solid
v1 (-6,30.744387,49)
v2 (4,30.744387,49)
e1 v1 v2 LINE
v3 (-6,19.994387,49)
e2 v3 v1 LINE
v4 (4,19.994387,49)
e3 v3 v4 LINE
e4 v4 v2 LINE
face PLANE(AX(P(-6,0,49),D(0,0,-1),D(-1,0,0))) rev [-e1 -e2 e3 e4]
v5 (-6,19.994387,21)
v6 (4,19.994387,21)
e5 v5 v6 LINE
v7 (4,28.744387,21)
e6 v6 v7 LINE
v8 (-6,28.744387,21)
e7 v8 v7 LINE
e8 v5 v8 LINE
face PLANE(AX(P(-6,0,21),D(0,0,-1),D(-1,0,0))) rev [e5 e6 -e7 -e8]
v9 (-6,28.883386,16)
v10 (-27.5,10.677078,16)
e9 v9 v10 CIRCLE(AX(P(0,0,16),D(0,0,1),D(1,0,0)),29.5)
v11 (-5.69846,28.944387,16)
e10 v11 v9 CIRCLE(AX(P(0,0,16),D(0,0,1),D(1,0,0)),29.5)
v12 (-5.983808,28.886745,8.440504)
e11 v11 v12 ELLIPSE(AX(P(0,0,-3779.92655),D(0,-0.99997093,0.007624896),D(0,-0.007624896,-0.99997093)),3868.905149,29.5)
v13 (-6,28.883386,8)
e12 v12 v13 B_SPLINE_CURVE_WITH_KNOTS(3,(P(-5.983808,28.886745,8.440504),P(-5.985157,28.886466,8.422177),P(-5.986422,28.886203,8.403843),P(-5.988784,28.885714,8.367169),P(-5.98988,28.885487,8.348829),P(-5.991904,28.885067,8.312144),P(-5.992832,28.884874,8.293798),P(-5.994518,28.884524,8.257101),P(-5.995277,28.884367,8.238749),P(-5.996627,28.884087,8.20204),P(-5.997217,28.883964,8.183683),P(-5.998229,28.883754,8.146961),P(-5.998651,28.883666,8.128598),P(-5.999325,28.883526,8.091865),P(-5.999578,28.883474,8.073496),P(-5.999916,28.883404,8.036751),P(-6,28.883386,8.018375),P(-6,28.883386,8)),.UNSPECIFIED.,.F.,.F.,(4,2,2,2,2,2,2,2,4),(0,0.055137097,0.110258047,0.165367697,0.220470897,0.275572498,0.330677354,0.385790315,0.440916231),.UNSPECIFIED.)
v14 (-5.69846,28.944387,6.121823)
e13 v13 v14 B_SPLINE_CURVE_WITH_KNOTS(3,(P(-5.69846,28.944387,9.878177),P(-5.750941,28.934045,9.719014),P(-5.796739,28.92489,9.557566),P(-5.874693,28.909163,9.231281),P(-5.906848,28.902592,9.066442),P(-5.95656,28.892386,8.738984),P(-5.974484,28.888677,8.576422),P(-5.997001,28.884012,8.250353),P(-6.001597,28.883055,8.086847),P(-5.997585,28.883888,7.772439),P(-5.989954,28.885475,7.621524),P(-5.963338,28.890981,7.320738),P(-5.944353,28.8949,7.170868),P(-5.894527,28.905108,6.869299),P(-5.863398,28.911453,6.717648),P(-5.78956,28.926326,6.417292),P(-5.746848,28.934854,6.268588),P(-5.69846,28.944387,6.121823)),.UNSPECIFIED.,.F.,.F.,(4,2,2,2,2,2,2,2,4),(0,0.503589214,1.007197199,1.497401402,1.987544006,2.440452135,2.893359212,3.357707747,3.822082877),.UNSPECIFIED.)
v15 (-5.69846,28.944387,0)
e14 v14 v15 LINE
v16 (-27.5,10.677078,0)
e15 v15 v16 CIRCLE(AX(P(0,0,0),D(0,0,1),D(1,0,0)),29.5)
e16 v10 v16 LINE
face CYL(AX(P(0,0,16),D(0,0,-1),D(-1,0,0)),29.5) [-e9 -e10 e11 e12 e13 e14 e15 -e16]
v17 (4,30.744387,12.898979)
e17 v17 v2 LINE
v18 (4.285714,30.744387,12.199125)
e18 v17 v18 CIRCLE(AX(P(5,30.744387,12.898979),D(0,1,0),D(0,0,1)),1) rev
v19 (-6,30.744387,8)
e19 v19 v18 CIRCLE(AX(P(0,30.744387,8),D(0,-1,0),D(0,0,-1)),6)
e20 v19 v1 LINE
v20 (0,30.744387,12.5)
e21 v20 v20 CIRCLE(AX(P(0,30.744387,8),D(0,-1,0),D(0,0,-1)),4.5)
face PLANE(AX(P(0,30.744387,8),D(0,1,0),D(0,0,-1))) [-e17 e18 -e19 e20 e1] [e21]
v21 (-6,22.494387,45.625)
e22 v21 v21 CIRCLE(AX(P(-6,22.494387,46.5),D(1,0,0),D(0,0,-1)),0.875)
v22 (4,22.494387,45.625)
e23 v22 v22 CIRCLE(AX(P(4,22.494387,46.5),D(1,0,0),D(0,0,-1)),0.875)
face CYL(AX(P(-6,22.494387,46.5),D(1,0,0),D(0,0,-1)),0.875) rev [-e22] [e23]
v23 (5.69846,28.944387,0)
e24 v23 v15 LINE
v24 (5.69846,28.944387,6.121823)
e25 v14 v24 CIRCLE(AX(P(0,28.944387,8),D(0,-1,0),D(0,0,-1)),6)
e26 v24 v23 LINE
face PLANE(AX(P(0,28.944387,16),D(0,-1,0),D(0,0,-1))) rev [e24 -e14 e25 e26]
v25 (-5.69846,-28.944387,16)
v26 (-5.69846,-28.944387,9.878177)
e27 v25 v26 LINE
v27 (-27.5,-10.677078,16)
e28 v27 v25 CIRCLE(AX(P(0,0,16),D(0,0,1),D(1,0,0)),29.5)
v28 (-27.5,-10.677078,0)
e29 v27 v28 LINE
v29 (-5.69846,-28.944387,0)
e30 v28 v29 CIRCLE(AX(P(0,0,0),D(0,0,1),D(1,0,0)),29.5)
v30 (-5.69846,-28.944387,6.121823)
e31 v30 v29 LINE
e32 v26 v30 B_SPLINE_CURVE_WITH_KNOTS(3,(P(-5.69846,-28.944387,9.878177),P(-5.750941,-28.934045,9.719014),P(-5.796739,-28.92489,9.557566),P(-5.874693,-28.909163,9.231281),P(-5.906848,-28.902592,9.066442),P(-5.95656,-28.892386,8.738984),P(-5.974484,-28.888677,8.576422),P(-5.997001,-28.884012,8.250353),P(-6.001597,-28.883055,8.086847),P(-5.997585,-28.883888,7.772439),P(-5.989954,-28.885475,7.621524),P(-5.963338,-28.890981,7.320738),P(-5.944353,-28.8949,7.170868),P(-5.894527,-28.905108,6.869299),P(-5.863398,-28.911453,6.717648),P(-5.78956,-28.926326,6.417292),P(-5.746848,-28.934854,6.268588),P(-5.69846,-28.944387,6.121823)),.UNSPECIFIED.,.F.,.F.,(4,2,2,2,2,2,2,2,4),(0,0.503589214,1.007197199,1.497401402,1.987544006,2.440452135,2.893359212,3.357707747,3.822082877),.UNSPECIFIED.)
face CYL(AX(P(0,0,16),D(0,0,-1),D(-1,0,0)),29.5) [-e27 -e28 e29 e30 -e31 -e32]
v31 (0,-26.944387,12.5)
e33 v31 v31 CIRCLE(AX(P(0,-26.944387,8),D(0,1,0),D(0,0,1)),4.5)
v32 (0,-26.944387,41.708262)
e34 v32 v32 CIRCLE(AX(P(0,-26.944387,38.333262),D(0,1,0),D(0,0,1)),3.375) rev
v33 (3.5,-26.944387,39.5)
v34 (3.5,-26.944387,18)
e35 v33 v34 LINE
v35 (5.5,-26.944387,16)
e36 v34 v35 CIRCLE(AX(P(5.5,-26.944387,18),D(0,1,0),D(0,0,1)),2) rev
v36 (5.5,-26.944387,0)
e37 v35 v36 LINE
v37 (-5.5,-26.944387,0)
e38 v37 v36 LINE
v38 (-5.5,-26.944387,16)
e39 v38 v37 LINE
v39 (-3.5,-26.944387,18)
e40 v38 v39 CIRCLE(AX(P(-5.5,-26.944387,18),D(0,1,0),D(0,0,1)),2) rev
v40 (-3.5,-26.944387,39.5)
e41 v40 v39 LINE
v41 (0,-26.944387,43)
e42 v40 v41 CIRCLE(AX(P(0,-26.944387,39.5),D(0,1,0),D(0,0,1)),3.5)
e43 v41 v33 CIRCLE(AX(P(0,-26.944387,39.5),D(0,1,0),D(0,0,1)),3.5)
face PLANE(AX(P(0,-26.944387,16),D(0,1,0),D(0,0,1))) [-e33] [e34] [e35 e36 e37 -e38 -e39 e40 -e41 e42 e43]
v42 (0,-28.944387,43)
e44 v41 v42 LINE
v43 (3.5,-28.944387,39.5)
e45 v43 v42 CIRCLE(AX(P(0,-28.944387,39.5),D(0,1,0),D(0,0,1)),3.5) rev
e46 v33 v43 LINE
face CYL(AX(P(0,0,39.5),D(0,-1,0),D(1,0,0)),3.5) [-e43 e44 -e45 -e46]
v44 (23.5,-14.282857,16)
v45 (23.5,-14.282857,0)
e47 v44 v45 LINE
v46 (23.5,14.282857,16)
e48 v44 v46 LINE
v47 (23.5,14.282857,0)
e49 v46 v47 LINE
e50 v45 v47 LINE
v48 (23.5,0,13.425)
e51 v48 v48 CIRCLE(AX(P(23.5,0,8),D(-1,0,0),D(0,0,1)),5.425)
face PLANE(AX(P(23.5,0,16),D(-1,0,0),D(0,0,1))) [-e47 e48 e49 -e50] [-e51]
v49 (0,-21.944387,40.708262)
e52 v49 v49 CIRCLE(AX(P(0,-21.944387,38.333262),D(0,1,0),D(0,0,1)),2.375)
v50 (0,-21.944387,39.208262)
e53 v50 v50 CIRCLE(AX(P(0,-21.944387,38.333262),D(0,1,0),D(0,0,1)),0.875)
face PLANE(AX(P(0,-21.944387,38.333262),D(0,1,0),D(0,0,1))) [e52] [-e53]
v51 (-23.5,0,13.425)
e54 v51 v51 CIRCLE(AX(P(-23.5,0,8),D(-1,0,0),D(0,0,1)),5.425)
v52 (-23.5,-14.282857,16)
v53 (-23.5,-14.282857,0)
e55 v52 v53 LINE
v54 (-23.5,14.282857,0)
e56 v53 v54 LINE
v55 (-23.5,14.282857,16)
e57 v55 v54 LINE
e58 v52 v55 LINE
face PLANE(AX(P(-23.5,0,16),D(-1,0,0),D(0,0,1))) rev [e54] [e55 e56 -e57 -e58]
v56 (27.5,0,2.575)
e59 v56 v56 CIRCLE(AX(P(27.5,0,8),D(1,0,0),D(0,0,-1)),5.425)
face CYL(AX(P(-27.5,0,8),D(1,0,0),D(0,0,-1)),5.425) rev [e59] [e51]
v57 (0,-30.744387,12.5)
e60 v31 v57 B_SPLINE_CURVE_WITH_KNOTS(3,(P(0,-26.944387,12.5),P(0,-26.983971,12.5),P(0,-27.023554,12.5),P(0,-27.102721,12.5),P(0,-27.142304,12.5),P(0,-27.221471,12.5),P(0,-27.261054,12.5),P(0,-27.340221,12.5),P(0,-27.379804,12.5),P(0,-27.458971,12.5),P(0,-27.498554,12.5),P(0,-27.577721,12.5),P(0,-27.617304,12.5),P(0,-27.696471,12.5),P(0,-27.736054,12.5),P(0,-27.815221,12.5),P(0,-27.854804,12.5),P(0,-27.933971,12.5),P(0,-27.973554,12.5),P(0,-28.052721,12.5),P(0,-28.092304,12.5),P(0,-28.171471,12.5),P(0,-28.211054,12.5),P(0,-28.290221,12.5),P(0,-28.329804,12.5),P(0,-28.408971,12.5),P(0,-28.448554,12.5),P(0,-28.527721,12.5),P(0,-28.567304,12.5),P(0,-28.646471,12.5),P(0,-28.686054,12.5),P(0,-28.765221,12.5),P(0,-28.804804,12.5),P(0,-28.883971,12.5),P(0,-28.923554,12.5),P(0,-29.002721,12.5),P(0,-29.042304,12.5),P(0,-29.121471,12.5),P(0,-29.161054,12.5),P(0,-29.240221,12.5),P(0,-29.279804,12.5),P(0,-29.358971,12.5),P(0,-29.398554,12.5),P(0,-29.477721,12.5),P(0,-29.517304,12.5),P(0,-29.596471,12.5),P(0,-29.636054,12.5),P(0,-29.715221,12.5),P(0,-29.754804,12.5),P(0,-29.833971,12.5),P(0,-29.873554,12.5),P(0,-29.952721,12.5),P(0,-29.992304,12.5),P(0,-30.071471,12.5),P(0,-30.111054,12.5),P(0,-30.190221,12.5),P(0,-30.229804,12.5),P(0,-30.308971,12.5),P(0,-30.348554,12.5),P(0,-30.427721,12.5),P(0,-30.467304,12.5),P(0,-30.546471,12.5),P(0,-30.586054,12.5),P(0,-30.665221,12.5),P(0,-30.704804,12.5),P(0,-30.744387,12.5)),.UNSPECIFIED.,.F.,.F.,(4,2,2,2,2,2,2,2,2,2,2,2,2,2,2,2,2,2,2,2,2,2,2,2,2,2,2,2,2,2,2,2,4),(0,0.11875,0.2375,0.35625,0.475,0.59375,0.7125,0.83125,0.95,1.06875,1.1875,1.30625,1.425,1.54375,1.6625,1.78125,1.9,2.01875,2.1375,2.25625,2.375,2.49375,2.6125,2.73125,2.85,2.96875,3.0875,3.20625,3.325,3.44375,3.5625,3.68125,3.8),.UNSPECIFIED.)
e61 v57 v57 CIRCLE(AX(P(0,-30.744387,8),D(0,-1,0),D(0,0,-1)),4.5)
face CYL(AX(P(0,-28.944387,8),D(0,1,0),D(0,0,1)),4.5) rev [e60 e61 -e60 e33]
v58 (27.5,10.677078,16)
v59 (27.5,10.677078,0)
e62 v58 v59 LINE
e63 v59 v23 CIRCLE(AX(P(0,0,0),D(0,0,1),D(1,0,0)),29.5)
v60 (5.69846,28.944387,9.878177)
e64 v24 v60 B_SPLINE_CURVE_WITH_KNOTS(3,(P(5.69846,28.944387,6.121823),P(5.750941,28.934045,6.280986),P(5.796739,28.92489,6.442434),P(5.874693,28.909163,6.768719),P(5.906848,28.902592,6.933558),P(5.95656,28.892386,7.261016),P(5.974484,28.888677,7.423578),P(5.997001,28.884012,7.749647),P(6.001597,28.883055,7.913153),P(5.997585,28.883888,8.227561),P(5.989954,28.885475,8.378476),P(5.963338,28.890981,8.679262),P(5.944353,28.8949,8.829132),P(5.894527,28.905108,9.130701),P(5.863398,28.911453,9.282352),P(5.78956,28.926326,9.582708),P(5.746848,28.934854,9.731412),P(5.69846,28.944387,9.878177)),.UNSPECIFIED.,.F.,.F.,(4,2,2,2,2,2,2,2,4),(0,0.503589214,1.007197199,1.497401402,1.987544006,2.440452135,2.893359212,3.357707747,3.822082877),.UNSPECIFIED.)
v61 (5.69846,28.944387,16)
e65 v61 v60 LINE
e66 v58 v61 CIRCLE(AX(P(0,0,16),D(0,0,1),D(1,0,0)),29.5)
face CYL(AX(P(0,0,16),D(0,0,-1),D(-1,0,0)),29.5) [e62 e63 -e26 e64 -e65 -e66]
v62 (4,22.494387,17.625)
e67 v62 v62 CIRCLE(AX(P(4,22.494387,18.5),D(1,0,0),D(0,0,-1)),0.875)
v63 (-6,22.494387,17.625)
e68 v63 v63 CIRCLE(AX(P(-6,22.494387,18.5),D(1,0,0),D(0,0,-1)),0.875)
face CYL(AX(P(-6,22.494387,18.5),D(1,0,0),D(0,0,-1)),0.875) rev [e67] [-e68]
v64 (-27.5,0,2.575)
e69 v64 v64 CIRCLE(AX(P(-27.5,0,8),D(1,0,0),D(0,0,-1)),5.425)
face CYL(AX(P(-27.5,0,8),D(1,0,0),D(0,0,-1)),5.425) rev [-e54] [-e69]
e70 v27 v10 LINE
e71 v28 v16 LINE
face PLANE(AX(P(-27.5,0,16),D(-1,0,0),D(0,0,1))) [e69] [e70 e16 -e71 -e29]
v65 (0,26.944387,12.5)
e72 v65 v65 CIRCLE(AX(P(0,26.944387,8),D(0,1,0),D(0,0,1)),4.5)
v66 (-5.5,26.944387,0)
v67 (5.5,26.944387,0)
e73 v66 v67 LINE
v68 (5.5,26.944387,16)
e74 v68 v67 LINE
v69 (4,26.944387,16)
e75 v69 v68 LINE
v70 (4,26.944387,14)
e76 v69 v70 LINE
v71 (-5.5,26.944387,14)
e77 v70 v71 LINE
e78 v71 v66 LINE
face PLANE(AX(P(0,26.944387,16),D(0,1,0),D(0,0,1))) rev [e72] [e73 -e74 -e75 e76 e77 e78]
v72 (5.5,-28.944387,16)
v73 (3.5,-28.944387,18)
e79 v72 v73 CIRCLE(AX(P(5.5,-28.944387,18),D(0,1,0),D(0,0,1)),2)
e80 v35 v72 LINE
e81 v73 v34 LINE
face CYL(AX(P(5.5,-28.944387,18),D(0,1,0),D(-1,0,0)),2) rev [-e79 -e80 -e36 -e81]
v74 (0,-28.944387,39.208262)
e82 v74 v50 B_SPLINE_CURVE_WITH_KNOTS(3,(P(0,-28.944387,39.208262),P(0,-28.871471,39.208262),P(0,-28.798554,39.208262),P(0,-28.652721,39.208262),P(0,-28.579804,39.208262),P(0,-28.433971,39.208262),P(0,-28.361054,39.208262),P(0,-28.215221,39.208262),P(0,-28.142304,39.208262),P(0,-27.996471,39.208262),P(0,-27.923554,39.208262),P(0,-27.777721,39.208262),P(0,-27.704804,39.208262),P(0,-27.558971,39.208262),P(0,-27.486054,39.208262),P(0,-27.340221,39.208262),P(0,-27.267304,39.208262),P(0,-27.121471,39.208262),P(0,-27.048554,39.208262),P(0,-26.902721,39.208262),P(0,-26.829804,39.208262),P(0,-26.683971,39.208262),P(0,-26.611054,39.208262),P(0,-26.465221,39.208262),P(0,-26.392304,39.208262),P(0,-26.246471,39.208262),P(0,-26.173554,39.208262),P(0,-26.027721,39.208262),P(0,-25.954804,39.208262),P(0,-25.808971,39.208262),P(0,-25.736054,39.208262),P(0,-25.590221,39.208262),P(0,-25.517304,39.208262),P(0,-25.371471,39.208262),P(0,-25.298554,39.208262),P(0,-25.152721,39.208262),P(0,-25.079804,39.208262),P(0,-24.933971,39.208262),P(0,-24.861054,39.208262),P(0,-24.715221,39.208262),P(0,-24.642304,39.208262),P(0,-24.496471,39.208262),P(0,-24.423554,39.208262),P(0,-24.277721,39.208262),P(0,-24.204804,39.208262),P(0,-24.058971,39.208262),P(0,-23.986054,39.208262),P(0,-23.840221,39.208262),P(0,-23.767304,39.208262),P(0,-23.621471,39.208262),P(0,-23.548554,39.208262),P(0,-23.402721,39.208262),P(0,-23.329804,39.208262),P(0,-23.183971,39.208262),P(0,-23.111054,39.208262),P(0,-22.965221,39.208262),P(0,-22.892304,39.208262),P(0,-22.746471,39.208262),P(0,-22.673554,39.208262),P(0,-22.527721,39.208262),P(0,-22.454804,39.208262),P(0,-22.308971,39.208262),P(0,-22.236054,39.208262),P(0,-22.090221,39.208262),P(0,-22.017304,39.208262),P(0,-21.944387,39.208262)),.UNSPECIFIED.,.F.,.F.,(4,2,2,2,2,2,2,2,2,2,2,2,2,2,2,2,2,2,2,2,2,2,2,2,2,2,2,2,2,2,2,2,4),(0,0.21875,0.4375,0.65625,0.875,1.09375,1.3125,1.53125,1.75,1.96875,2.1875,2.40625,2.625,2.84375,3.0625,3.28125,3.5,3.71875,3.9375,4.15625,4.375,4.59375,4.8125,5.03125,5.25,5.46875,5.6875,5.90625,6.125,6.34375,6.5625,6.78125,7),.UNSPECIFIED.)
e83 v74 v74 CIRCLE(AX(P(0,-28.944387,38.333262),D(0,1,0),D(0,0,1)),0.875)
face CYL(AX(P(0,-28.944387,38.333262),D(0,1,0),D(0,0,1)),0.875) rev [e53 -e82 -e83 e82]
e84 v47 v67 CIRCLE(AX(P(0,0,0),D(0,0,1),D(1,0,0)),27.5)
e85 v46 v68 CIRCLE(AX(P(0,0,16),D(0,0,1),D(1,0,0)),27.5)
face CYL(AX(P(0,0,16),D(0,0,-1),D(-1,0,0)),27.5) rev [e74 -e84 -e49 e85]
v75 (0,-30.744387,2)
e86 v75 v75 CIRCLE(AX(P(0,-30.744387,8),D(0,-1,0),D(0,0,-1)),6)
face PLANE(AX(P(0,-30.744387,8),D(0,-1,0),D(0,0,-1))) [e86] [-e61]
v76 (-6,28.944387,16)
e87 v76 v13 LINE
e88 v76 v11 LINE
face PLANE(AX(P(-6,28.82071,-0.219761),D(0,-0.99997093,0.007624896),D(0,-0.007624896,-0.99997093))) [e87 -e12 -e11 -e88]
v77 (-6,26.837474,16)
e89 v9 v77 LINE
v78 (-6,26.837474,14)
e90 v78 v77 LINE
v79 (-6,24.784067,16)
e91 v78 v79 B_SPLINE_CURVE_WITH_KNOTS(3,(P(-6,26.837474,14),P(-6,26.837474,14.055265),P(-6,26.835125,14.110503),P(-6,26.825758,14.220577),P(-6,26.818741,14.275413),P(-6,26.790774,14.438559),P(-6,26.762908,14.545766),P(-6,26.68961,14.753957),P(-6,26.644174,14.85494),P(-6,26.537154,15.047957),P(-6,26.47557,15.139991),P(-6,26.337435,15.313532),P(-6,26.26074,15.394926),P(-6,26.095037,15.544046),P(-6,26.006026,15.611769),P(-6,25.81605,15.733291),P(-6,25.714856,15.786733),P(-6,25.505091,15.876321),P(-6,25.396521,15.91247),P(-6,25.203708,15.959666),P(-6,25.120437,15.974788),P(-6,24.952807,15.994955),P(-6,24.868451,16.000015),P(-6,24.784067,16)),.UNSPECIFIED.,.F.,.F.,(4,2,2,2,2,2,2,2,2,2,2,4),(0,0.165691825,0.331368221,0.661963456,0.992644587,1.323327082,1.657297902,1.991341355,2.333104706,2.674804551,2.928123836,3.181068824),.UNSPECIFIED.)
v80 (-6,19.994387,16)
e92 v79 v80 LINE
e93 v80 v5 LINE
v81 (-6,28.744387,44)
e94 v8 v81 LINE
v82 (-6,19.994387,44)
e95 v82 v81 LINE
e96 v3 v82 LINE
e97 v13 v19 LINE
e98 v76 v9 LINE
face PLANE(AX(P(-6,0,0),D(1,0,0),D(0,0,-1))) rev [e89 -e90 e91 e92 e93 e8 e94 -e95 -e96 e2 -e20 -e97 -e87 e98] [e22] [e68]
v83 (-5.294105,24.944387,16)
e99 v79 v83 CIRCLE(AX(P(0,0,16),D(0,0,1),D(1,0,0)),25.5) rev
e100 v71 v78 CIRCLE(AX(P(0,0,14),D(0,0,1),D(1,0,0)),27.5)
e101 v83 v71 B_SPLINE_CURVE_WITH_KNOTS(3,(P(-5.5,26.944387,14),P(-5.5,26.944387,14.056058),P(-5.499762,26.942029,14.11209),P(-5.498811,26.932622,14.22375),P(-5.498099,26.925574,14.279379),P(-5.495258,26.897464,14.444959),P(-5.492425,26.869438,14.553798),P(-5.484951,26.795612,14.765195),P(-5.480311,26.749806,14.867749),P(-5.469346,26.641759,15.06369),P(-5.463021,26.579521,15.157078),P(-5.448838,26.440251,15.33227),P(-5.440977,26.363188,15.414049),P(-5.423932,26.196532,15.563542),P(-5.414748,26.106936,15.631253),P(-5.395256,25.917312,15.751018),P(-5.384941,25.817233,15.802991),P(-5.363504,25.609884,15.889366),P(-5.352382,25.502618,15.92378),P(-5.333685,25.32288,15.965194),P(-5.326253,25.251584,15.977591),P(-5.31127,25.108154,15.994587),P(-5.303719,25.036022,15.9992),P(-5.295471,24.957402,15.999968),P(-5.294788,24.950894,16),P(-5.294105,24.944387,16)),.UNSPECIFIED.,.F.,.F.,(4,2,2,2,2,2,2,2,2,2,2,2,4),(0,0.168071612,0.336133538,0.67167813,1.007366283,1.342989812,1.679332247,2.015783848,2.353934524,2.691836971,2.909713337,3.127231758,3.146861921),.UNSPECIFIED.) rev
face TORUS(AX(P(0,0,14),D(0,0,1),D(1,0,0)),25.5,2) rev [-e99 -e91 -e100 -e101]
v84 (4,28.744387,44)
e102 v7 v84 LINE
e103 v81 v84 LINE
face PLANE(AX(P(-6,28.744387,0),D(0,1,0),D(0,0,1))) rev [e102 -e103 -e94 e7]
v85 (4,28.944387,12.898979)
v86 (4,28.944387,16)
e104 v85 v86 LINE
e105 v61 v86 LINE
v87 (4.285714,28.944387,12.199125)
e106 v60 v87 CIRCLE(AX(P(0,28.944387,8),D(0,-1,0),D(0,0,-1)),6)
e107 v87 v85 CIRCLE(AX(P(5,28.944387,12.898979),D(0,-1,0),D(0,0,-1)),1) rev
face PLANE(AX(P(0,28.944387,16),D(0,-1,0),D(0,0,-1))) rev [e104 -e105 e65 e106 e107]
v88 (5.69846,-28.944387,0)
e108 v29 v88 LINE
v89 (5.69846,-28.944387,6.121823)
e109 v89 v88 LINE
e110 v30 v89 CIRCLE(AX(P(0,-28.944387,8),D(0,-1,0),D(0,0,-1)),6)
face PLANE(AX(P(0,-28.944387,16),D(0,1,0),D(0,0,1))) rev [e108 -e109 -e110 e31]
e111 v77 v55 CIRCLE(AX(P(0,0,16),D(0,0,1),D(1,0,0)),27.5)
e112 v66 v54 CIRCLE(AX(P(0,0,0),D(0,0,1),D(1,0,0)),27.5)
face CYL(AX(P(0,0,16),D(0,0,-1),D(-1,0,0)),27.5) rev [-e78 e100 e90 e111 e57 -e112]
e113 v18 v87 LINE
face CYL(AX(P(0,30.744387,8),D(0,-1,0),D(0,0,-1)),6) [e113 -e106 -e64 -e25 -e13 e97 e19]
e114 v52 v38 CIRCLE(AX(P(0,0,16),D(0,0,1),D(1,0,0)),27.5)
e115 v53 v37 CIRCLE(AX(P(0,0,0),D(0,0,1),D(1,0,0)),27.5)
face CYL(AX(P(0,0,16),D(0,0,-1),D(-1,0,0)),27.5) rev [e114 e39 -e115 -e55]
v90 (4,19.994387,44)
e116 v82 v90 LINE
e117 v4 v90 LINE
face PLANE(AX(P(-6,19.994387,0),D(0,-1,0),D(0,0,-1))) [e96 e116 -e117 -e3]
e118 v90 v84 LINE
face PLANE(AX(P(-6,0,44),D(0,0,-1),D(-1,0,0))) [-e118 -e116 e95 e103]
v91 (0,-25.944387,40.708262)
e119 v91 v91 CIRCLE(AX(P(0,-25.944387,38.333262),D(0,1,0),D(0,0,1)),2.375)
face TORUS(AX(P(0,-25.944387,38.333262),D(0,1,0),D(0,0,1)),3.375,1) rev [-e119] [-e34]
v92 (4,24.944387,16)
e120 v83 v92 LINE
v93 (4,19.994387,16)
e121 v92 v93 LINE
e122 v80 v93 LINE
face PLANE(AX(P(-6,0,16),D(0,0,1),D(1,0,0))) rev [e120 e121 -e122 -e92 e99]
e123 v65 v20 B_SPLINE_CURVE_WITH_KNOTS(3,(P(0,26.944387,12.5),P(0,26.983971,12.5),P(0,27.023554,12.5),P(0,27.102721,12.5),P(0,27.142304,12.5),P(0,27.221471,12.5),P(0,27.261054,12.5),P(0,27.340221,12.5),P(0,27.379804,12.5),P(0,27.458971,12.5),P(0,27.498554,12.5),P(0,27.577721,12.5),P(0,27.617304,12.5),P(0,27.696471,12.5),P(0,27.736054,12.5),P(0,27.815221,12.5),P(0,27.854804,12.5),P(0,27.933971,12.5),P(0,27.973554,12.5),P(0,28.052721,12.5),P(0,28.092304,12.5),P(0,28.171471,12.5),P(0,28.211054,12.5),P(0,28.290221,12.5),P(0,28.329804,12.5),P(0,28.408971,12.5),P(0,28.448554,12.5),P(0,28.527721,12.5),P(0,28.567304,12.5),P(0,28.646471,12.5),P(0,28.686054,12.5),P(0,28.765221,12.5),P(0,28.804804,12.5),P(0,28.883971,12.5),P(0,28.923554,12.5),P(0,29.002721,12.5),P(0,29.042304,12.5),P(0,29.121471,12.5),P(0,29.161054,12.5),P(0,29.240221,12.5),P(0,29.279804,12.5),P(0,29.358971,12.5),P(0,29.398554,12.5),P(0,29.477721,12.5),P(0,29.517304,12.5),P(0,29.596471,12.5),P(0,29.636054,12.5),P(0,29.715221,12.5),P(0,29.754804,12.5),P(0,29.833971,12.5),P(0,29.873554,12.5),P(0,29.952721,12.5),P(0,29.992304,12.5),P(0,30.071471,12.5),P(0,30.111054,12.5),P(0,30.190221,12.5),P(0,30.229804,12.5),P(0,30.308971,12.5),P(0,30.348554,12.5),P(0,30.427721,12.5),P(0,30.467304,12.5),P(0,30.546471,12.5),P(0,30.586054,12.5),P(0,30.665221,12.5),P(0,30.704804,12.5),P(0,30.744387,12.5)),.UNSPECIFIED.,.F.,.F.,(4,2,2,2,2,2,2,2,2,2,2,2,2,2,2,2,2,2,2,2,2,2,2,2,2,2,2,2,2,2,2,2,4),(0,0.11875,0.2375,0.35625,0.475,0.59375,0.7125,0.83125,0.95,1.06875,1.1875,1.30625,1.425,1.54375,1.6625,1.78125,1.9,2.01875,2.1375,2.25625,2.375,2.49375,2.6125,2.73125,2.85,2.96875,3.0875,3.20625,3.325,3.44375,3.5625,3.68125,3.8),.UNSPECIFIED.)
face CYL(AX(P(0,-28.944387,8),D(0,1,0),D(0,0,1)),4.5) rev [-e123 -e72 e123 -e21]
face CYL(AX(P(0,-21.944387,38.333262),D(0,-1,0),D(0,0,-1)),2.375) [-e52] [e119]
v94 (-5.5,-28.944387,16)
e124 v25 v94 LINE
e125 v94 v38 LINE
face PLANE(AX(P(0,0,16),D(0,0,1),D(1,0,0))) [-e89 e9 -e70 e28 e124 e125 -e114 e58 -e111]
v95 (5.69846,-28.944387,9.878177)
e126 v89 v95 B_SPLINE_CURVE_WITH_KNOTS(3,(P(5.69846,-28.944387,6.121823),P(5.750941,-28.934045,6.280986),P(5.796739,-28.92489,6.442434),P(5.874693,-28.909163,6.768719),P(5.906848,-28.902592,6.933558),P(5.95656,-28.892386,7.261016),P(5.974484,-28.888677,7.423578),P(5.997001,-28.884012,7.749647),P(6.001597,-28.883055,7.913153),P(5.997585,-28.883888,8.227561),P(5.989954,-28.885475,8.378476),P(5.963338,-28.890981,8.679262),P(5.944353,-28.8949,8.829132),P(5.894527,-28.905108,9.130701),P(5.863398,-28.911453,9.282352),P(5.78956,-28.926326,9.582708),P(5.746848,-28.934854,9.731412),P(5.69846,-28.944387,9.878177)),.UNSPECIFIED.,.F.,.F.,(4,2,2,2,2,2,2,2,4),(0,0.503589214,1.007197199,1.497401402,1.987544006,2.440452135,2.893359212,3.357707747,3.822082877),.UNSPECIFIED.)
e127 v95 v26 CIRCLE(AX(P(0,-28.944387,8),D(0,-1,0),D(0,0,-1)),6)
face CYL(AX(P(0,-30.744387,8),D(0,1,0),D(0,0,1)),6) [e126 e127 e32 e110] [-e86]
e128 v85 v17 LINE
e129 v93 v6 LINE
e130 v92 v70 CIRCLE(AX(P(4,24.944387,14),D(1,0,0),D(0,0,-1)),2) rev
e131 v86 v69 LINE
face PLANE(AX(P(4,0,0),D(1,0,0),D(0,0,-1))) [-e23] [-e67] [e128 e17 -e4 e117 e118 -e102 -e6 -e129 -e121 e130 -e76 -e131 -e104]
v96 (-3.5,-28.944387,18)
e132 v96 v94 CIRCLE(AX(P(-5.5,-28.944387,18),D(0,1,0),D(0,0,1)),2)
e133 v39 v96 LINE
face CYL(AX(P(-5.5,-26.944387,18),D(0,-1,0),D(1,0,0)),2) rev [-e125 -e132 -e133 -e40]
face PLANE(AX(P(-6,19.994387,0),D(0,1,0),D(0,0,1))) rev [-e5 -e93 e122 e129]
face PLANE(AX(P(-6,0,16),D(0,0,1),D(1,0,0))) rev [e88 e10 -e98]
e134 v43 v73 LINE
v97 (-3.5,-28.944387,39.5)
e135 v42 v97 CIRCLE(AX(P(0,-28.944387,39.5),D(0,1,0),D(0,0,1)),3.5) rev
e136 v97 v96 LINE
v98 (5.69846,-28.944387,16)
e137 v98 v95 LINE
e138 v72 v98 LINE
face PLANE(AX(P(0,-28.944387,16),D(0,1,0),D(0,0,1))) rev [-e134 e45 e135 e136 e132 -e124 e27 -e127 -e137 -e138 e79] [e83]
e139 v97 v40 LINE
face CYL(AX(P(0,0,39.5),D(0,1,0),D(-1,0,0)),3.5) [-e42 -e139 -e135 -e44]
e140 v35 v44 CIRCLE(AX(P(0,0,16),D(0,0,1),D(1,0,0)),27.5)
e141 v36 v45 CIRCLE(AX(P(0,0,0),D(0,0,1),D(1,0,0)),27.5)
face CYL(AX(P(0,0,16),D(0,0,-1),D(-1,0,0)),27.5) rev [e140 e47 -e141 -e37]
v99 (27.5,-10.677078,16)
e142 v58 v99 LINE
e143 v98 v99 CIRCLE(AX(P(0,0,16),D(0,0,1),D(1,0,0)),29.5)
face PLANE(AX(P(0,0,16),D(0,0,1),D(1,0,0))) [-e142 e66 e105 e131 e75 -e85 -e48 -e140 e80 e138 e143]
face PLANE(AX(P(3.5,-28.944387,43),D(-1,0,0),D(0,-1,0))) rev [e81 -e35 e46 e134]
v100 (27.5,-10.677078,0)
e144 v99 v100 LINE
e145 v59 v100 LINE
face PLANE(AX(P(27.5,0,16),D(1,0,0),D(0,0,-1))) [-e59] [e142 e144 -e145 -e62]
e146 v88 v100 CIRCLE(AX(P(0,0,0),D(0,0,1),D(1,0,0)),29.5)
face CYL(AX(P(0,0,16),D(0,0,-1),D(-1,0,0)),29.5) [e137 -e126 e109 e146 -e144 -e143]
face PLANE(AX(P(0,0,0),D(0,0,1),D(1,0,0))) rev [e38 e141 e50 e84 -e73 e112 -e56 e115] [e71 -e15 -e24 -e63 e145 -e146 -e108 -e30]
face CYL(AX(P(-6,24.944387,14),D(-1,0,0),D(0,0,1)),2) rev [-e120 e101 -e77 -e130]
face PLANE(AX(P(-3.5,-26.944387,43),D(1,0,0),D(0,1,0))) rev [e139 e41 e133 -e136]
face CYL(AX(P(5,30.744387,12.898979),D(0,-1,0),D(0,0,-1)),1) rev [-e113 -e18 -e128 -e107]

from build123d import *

# Parameters (mm, degrees)
BOSS_EXTRUDE1_DEPTH      = 16
SKETCH3_W                = 7
SKETCH3_H                = 2
BOSS_EXTRUDE2_DEPTH      = 27
FILLET1_R                = 3.5
CUT_EXTRUDE1_DEPTH       = 59.677317156
CUT_EXTRUDE1_DEPTH_BACK  = 59.677317156
SKETCH4_R                = 5.425
CUT_EXTRUDE2_DEPTH       = 59.677317156
CUT_EXTRUDE2_DEPTH_BACK  = 59.677317156
SKETCH5_R                = 4.5
SKETCH5_R_2              = 0.875
BOSS_EXTRUDE4_START      = -0.061001
SKETCH8_R                = 6
SKETCH8_R_2              = 4.5
BOSS_EXTRUDE4_DEPTH      = 1.861001
FILLET2_R                = 2
BOSS_EXTRUDE3_DEPTH      = 4
BOSS_EXTRUDE3_DEPTH_BACK = 6
SKETCH6_R                = 0.875
FILLET3_R                = 2
CUT_EXTRUDE3_DEPTH       = 65.050506352
CUT_EXTRUDE3_DEPTH_BACK  = 65.050506352
SKETCH9_R                = 4.5
BOSS_EXTRUDE5_START      = 5
SKETCH10_R               = 2.375
SKETCH10_R_2             = 0.875
BOSS_EXTRUDE5_DEPTH      = 5
FILLET4_R                = 1


with BuildPart() as part:
    # Sketch2 → Boss-Extrude1 (new body)
    # profile 1 of 3: a face of its own
    with BuildSketch(Plane(origin=(0, 0, 0), x_dir=(0, 1, 0), z_dir=(0, 0, 1))):
        with BuildLine():
            Line((10.677078252, -27.5), (-10.677078252, -27.5))
            ThreePointArc((-10.677078252, -27.5), (-22.611764912, -18.946189263), (-28.944387171, -5.698460434))
            Line((-28.944387171, -5.698460434), (-28.944387171, 5.698460434))
            ThreePointArc((-28.944387171, 5.698460434), (-22.611764912, 18.946189263), (-10.677078252, 27.5))
            Line((-10.677078252, 27.5), (10.677078252, 27.5))
            ThreePointArc((10.677078252, 27.5), (22.611764912, 18.946189263), (28.944387171, 5.698460434))
            Line((28.944387171, 5.698460434), (28.944387171, -5.698460434))
            ThreePointArc((28.944387171, -5.698460434), (22.611764912, -18.946189263), (10.677078252, -27.5))
        make_face()
        with BuildLine():
            ThreePointArc((10.295630141, -25.5), (21.135390281, -17.593898876), (26.944387171, -5.5))
            Line((26.944387171, -5.5), (26.944387171, 5.5))
            ThreePointArc((26.944387171, 5.5), (21.135390281, 17.593898876), (10.295630141, 25.5))
            Line((10.295630141, 25.5), (-10.295630141, 25.5))
            ThreePointArc((-10.295630141, 25.5), (-21.135390281, 17.593898876), (-26.944387171, 5.5))
            Line((-26.944387171, 5.5), (-26.944387171, -5.5))
            ThreePointArc((-26.944387171, -5.5), (-21.135390281, -17.593898876), (-10.295630141, -25.5))
            Line((-10.295630141, -25.5), (10.295630141, -25.5))
        make_face(mode=Mode.SUBTRACT)
    # profile 2 of 3: a face of its own
    with BuildSketch(Plane(origin=(0, 0, 0), x_dir=(0, 1, 0), z_dir=(0, 0, 1))):
        with BuildLine():
            Line((10.295630141, 25.5), (-10.295630141, 25.5))
            ThreePointArc((-10.295630141, 25.5), (-12.329862358, 24.580978301), (-14.282856857, 23.5))
            Line((-14.282856857, 23.5), (14.282856857, 23.5))
            ThreePointArc((14.282856857, 23.5), (12.329862358, 24.580978301), (10.295630141, 25.5))
        make_face()
    # profile 3 of 3: a face of its own
    with BuildSketch(Plane(origin=(0, 0, 0), x_dir=(0, 1, 0), z_dir=(0, 0, 1))):
        with BuildLine():
            Line((14.282856857, -23.5), (-14.282856857, -23.5))
            ThreePointArc((-14.282856857, -23.5), (-12.329862358, -24.580978301), (-10.295630141, -25.5))
            Line((-10.295630141, -25.5), (10.295630141, -25.5))
            ThreePointArc((10.295630141, -25.5), (12.329862358, -24.580978301), (14.282856857, -23.5))
        make_face()
    extrude(amount=BOSS_EXTRUDE1_DEPTH)

    # Sketch3 → Boss-Extrude2 (add)
    with BuildSketch(Plane.XY.offset(16)):
        with Locations((0, -27.944387171)):
            Rectangle(SKETCH3_W, SKETCH3_H)
    extrude(amount=BOSS_EXTRUDE2_DEPTH)

    # Fillet1
    fillet1_edges = [part.edges().sort_by_distance(p)[0] for p in [
        (-3.5, -27.944387171, 43),
        (3.5, -27.944387171, 43),
    ]]
    fillet(fillet1_edges, radius=FILLET1_R - 0.0001)  # a hair under: the kernel refuses the full size

    # Sketch4 → Cut-Extrude1 (cut, two sides: drawn at the far end of the back side and taken through both)
    with BuildSketch(Plane.YZ.offset(-CUT_EXTRUDE1_DEPTH_BACK)):
        with Locations(Location((0, 8, 0), (0, 0, 270))):
            Circle(SKETCH4_R)
    extrude(amount=CUT_EXTRUDE1_DEPTH + CUT_EXTRUDE1_DEPTH_BACK, mode=Mode.SUBTRACT)

    # Sketch5 → Cut-Extrude2 (cut, two sides: drawn at the far end of the back side and taken through both)
    with BuildSketch(Plane(origin=(0, 0, 0), x_dir=(-1, 0, 0), z_dir=(0, 1, 0)).offset(-CUT_EXTRUDE2_DEPTH_BACK)):
        with Locations(Location((0, 8, 0), (0, 0, 90))):
            Circle(SKETCH5_R)
        with Locations(Location((0, 38.333262144, 0), (0, 0, 90))):
            Circle(SKETCH5_R_2)
    extrude(amount=CUT_EXTRUDE2_DEPTH + CUT_EXTRUDE2_DEPTH_BACK, mode=Mode.SUBTRACT)

    # Sketch8 → Boss-Extrude4 (add)
    with BuildSketch(Plane.XZ.offset(28.944387171).offset(BOSS_EXTRUDE4_START)):
        with Locations(Location((0, 8, 0), (0, 0, 161.758103013))):
            Circle(SKETCH8_R)
        with Locations(Location((0, 8, 0), (0, 0, 90))):
            Circle(SKETCH8_R_2, mode=Mode.SUBTRACT)
    boss_extrude4 = extrude(amount=BOSS_EXTRUDE4_DEPTH)

    # Mirror1: Boss-Extrude4 across plane
    add(boss_extrude4.mirror(Plane.ZX))

    # Fillet2
    fillet2_edges = [part.edges().sort_by_distance(p)[0] for p in [
        (-3.5, -27.944387171, 16),
        (3.5, -27.944387171, 16),
    ]]
    fillet(fillet2_edges, radius=FILLET2_R)

    # Sketch6 → Boss-Extrude3 (add, two sides: drawn at the far end of the back side and taken through both)
    with BuildSketch(Plane.YZ.offset(-BOSS_EXTRUDE3_DEPTH_BACK)):
        Polygon((19.994387171, 49), (19.994387171, 44), (28.744387171, 44), (28.744387171, 21), (19.994387171, 21), (19.994387171, 16), (28.944387171, 16), (28.883386228, 8), (30.744387171, 8), (30.744387171, 16), (30.744387171, 49), align=None)
        with Locations(Location((22.494387171, 46.5, 0), (0, 0, 270))):
            Circle(SKETCH6_R, mode=Mode.SUBTRACT)
        with Locations(Location((22.494387171, 18.5, 0), (0, 0, 270))):
            Circle(SKETCH6_R, mode=Mode.SUBTRACT)
    extrude(amount=BOSS_EXTRUDE3_DEPTH + BOSS_EXTRUDE3_DEPTH_BACK)

    # Fillet3
    fillet3_edges = [part.edges().sort_by_distance(p)[0] for p in [
        (-5.750248483, 26.892092562, 16),
        (-0.75, 26.944387171, 16),
    ]]
    fillet(fillet3_edges, radius=FILLET3_R)

    # Sketch9 → Cut-Extrude3 (cut, two sides: drawn at the far end of the back side and taken through both)
    with BuildSketch(Plane(origin=(0, 0, 0), x_dir=(-1, 0, 0), z_dir=(0, 1, 0)).offset(-CUT_EXTRUDE3_DEPTH_BACK)):
        with Locations(Location((0, 8, 0), (0, 0, 90))):
            Circle(SKETCH9_R)
    extrude(amount=CUT_EXTRUDE3_DEPTH + CUT_EXTRUDE3_DEPTH_BACK, mode=Mode.SUBTRACT)

    # Sketch10 → Boss-Extrude5 (add)
    with BuildSketch(Plane(origin=(0, -26.944387171, 0), x_dir=(-1, 0, 0), z_dir=(0, 1, 0)).offset(BOSS_EXTRUDE5_START)):
        with Locations(Location((0, 38.333262144, 0), (0, 0, 90))):
            Circle(SKETCH10_R)
        with Locations(Location((0, 38.333262144, 0), (0, 0, 90))):
            Circle(SKETCH10_R_2, mode=Mode.SUBTRACT)
    extrude(amount=-BOSS_EXTRUDE5_DEPTH)

    # Fillet4
    fillet4_edges = [part.edges().sort_by_distance(p)[0] for p in [
        (4, 29.844387171, 12.472135955),
        (0, -26.944387171, 35.958262144),
    ]]
    fillet(fillet4_edges, radius=FILLET4_R)


solid = part.part
